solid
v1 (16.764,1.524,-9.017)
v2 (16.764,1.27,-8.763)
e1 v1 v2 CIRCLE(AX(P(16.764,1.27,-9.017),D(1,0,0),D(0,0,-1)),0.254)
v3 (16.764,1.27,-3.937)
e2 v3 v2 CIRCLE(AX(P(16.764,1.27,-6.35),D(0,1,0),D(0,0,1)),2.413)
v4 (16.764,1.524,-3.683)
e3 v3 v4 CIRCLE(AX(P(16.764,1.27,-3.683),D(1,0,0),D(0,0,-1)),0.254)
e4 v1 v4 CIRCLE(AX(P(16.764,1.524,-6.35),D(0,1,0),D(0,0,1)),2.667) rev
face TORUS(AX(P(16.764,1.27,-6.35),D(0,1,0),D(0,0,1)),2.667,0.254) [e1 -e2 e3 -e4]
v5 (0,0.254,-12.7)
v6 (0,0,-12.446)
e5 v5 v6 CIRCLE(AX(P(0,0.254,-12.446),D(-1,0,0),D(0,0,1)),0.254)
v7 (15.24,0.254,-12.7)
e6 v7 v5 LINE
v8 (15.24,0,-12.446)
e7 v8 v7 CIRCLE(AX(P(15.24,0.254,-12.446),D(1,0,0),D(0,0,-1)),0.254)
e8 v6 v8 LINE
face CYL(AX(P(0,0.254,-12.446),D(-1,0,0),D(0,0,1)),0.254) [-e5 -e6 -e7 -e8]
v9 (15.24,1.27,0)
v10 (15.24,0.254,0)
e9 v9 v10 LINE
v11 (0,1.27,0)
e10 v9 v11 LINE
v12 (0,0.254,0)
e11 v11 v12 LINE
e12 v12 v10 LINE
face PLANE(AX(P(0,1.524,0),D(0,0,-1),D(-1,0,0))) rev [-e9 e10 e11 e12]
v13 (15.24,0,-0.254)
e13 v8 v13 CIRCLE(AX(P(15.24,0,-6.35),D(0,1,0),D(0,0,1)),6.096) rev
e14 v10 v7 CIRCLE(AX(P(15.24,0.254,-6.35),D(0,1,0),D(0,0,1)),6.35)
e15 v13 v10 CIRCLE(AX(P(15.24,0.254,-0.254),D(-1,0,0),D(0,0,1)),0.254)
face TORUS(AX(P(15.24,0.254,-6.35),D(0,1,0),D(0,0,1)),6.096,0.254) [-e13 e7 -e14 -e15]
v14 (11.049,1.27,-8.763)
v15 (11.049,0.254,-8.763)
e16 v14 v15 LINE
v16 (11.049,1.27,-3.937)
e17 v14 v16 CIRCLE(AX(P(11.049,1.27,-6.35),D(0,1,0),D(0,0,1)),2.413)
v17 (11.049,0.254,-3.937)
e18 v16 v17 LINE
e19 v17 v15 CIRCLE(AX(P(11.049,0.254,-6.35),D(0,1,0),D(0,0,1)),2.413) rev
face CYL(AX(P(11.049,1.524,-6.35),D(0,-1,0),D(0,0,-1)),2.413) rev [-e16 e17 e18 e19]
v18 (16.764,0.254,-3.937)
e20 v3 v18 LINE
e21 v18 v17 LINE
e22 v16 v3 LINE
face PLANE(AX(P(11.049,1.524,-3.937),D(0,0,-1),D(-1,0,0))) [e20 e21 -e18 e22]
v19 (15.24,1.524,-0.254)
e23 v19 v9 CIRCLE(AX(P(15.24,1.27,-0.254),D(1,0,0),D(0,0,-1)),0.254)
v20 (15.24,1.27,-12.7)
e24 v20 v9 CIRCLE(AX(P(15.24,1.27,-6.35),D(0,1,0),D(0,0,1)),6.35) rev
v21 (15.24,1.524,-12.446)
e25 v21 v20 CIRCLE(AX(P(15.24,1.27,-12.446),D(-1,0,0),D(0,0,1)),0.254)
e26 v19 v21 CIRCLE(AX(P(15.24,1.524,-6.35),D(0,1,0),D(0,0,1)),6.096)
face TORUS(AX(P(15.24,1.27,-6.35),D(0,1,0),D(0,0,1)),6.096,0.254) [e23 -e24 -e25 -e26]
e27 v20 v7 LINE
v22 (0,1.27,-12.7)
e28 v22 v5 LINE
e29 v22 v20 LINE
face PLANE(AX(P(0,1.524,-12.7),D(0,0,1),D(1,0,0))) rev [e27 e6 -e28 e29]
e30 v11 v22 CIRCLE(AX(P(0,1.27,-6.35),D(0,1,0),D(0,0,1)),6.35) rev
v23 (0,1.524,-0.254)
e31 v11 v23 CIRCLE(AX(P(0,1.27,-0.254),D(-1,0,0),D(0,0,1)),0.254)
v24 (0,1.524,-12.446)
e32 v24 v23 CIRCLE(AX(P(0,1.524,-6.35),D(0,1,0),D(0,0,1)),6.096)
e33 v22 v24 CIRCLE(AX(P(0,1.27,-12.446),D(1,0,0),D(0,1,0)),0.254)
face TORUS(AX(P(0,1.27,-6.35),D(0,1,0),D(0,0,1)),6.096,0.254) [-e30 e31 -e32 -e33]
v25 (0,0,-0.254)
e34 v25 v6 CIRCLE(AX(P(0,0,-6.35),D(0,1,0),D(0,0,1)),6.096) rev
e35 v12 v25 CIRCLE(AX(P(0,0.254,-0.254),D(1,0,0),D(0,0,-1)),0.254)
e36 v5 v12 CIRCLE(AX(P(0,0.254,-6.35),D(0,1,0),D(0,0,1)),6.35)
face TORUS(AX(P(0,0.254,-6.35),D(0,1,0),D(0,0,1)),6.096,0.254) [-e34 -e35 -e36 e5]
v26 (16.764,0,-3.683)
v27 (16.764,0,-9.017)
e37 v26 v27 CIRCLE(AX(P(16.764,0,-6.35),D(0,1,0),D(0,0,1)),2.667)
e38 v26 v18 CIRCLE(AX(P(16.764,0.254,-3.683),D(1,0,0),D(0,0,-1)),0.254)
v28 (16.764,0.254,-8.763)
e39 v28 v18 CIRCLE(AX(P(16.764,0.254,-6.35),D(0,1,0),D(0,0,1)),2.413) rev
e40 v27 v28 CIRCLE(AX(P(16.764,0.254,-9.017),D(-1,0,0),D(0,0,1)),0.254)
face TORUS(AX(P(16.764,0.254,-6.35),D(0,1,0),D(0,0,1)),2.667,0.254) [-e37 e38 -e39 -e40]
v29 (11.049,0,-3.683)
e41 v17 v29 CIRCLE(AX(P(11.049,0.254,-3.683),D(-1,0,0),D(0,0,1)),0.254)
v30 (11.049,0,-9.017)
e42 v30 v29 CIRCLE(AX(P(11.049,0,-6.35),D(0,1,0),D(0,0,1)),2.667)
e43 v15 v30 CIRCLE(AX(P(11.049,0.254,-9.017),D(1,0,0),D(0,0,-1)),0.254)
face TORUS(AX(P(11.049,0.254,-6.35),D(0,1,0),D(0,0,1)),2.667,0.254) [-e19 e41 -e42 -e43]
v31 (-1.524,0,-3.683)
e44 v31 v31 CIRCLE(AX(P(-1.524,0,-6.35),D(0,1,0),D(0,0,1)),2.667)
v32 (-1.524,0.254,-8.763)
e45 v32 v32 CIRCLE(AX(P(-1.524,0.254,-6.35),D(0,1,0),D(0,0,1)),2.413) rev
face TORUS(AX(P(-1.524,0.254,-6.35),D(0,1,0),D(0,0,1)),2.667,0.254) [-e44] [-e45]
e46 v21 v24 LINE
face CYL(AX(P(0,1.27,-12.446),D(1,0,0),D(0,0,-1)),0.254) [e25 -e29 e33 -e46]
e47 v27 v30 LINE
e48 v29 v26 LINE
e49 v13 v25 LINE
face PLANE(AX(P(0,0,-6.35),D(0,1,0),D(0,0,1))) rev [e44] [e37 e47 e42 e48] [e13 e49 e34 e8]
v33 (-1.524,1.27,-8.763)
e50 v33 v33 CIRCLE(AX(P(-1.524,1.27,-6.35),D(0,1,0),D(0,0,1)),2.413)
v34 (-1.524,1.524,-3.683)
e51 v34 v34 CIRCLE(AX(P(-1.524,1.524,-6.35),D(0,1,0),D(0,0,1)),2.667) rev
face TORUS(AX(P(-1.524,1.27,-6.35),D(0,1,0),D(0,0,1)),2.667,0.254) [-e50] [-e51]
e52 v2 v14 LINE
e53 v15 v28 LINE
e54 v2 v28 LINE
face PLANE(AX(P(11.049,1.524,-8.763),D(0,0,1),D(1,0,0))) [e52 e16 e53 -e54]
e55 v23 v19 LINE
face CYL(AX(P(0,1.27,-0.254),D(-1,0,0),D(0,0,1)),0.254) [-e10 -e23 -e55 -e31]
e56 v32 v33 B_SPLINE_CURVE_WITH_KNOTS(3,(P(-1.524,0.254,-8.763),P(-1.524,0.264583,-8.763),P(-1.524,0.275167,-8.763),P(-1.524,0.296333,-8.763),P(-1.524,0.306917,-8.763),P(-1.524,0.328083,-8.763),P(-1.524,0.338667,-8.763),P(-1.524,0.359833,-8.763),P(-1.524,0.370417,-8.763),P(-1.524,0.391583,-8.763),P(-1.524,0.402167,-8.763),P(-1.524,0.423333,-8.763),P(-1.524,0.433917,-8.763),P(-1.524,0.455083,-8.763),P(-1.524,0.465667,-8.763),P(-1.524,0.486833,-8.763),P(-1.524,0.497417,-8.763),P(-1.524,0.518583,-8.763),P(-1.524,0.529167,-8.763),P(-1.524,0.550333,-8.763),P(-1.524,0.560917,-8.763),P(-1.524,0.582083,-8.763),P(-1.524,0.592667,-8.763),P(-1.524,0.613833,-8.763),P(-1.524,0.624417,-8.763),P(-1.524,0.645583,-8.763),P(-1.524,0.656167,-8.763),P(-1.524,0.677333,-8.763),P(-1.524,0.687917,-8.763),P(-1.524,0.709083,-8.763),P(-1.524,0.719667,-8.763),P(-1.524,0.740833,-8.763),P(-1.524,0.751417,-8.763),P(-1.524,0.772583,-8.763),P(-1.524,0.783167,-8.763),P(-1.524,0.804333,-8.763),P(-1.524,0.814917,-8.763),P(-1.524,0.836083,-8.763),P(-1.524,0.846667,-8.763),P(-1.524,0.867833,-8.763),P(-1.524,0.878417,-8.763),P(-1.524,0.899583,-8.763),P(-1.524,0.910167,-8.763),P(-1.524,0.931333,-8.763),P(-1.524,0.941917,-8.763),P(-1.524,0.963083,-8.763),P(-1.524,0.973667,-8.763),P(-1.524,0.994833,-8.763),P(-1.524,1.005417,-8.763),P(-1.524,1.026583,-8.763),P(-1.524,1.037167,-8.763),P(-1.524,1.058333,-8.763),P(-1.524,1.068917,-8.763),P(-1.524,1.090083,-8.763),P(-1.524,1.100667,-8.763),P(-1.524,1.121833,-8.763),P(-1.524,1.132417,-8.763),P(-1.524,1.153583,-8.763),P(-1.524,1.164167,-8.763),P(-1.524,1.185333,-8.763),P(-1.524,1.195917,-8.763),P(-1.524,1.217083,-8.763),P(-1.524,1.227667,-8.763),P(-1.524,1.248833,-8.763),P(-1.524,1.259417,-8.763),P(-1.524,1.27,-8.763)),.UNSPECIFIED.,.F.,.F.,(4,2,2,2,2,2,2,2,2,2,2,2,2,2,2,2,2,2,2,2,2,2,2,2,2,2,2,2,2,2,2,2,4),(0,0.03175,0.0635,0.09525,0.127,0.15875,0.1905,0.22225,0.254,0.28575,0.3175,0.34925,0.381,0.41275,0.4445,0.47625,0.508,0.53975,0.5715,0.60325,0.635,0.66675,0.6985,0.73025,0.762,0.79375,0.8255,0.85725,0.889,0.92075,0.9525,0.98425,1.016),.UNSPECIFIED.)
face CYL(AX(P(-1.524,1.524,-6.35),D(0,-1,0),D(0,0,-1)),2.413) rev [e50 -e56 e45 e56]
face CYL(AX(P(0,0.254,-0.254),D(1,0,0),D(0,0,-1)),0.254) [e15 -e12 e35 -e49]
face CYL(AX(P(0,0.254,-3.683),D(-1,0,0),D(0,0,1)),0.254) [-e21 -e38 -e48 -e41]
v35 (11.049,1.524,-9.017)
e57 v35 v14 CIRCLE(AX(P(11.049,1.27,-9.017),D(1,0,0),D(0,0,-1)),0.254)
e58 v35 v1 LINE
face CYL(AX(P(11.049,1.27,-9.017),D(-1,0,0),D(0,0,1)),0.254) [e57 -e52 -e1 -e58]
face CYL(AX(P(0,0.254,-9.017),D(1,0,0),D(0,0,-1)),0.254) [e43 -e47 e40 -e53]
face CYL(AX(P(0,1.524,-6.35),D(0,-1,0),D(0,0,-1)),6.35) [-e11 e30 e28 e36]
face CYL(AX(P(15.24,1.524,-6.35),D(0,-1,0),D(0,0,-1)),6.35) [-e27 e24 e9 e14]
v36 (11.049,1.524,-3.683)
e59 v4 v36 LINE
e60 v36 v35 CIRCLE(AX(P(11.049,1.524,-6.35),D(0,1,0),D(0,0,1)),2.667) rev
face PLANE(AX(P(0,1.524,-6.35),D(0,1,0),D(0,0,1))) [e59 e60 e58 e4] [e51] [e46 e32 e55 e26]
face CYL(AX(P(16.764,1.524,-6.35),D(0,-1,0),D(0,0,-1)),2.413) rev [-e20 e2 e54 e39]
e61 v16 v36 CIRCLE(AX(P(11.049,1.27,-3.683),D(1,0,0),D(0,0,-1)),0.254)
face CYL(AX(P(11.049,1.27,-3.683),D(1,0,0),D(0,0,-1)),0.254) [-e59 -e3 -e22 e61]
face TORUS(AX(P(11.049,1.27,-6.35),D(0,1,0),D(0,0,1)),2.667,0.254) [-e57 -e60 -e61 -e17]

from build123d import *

# Parameters (mm, degrees)
SKETCH1_R          = 2.413
BASE_FLANGE1_DEPTH = 1.524
FILLET2_R          = 0.254


# Sheet-metal steps are written as plain solids
with BuildPart() as part:
    # Sketch1 → Base-Flange1 (new body)
    with BuildSketch(Plane(origin=(0, 0, 0), x_dir=(1, 0, 0), z_dir=(0, 1, 0))):
        with BuildLine():
            Line((0, 0), (15.24, 0))
            ThreePointArc((15.24, 0), (21.59, 6.35), (15.24, 12.7))
            Line((15.24, 12.7), (0, 12.7))
            ThreePointArc((0, 12.7), (-6.35, 6.35), (0, 0))
        make_face()
        with Locations(Location((-1.524, 6.35, 0), (0, 0, 90))):
            Circle(SKETCH1_R, mode=Mode.SUBTRACT)
        with BuildLine():
            Line((11.049, 8.763), (16.764, 8.763))
            ThreePointArc((16.764, 8.763), (19.177, 6.35), (16.764, 3.937))
            Line((16.764, 3.937), (11.049, 3.937))
            ThreePointArc((11.049, 3.937), (8.636, 6.35), (11.049, 8.763))
        make_face(mode=Mode.SUBTRACT)
    extrude(amount=BASE_FLANGE1_DEPTH)

    # Fillet2
    fillet2_edges = [part.edges().sort_by_distance(p)[0] for p in [
        (21.59, 1.524, -6.35),
        (-1.524, 0, -3.937),
        (-1.524, 1.524, -3.937),
        (7.62, 1.524, -12.7),
        (8.636, 0, -6.35),
        (13.9065, 0, -3.937),
        (19.177, 0, -6.35),
        (13.9065, 0, -8.763),
        (8.636, 1.524, -6.35),
        (13.9065, 1.524, -3.937),
        (19.177, 1.524, -6.35),
        (13.9065, 1.524, -8.763),
        (-6.35, 1.524, -6.35),
        (7.62, 0, -12.7),
        (21.59, 0, -6.35),
        (7.62, 0, 0),
        (-6.35, 0, -6.35),
        (7.62, 1.524, 0),
    ]]
    fillet(fillet2_edges, radius=FILLET2_R)


solid = part.part
